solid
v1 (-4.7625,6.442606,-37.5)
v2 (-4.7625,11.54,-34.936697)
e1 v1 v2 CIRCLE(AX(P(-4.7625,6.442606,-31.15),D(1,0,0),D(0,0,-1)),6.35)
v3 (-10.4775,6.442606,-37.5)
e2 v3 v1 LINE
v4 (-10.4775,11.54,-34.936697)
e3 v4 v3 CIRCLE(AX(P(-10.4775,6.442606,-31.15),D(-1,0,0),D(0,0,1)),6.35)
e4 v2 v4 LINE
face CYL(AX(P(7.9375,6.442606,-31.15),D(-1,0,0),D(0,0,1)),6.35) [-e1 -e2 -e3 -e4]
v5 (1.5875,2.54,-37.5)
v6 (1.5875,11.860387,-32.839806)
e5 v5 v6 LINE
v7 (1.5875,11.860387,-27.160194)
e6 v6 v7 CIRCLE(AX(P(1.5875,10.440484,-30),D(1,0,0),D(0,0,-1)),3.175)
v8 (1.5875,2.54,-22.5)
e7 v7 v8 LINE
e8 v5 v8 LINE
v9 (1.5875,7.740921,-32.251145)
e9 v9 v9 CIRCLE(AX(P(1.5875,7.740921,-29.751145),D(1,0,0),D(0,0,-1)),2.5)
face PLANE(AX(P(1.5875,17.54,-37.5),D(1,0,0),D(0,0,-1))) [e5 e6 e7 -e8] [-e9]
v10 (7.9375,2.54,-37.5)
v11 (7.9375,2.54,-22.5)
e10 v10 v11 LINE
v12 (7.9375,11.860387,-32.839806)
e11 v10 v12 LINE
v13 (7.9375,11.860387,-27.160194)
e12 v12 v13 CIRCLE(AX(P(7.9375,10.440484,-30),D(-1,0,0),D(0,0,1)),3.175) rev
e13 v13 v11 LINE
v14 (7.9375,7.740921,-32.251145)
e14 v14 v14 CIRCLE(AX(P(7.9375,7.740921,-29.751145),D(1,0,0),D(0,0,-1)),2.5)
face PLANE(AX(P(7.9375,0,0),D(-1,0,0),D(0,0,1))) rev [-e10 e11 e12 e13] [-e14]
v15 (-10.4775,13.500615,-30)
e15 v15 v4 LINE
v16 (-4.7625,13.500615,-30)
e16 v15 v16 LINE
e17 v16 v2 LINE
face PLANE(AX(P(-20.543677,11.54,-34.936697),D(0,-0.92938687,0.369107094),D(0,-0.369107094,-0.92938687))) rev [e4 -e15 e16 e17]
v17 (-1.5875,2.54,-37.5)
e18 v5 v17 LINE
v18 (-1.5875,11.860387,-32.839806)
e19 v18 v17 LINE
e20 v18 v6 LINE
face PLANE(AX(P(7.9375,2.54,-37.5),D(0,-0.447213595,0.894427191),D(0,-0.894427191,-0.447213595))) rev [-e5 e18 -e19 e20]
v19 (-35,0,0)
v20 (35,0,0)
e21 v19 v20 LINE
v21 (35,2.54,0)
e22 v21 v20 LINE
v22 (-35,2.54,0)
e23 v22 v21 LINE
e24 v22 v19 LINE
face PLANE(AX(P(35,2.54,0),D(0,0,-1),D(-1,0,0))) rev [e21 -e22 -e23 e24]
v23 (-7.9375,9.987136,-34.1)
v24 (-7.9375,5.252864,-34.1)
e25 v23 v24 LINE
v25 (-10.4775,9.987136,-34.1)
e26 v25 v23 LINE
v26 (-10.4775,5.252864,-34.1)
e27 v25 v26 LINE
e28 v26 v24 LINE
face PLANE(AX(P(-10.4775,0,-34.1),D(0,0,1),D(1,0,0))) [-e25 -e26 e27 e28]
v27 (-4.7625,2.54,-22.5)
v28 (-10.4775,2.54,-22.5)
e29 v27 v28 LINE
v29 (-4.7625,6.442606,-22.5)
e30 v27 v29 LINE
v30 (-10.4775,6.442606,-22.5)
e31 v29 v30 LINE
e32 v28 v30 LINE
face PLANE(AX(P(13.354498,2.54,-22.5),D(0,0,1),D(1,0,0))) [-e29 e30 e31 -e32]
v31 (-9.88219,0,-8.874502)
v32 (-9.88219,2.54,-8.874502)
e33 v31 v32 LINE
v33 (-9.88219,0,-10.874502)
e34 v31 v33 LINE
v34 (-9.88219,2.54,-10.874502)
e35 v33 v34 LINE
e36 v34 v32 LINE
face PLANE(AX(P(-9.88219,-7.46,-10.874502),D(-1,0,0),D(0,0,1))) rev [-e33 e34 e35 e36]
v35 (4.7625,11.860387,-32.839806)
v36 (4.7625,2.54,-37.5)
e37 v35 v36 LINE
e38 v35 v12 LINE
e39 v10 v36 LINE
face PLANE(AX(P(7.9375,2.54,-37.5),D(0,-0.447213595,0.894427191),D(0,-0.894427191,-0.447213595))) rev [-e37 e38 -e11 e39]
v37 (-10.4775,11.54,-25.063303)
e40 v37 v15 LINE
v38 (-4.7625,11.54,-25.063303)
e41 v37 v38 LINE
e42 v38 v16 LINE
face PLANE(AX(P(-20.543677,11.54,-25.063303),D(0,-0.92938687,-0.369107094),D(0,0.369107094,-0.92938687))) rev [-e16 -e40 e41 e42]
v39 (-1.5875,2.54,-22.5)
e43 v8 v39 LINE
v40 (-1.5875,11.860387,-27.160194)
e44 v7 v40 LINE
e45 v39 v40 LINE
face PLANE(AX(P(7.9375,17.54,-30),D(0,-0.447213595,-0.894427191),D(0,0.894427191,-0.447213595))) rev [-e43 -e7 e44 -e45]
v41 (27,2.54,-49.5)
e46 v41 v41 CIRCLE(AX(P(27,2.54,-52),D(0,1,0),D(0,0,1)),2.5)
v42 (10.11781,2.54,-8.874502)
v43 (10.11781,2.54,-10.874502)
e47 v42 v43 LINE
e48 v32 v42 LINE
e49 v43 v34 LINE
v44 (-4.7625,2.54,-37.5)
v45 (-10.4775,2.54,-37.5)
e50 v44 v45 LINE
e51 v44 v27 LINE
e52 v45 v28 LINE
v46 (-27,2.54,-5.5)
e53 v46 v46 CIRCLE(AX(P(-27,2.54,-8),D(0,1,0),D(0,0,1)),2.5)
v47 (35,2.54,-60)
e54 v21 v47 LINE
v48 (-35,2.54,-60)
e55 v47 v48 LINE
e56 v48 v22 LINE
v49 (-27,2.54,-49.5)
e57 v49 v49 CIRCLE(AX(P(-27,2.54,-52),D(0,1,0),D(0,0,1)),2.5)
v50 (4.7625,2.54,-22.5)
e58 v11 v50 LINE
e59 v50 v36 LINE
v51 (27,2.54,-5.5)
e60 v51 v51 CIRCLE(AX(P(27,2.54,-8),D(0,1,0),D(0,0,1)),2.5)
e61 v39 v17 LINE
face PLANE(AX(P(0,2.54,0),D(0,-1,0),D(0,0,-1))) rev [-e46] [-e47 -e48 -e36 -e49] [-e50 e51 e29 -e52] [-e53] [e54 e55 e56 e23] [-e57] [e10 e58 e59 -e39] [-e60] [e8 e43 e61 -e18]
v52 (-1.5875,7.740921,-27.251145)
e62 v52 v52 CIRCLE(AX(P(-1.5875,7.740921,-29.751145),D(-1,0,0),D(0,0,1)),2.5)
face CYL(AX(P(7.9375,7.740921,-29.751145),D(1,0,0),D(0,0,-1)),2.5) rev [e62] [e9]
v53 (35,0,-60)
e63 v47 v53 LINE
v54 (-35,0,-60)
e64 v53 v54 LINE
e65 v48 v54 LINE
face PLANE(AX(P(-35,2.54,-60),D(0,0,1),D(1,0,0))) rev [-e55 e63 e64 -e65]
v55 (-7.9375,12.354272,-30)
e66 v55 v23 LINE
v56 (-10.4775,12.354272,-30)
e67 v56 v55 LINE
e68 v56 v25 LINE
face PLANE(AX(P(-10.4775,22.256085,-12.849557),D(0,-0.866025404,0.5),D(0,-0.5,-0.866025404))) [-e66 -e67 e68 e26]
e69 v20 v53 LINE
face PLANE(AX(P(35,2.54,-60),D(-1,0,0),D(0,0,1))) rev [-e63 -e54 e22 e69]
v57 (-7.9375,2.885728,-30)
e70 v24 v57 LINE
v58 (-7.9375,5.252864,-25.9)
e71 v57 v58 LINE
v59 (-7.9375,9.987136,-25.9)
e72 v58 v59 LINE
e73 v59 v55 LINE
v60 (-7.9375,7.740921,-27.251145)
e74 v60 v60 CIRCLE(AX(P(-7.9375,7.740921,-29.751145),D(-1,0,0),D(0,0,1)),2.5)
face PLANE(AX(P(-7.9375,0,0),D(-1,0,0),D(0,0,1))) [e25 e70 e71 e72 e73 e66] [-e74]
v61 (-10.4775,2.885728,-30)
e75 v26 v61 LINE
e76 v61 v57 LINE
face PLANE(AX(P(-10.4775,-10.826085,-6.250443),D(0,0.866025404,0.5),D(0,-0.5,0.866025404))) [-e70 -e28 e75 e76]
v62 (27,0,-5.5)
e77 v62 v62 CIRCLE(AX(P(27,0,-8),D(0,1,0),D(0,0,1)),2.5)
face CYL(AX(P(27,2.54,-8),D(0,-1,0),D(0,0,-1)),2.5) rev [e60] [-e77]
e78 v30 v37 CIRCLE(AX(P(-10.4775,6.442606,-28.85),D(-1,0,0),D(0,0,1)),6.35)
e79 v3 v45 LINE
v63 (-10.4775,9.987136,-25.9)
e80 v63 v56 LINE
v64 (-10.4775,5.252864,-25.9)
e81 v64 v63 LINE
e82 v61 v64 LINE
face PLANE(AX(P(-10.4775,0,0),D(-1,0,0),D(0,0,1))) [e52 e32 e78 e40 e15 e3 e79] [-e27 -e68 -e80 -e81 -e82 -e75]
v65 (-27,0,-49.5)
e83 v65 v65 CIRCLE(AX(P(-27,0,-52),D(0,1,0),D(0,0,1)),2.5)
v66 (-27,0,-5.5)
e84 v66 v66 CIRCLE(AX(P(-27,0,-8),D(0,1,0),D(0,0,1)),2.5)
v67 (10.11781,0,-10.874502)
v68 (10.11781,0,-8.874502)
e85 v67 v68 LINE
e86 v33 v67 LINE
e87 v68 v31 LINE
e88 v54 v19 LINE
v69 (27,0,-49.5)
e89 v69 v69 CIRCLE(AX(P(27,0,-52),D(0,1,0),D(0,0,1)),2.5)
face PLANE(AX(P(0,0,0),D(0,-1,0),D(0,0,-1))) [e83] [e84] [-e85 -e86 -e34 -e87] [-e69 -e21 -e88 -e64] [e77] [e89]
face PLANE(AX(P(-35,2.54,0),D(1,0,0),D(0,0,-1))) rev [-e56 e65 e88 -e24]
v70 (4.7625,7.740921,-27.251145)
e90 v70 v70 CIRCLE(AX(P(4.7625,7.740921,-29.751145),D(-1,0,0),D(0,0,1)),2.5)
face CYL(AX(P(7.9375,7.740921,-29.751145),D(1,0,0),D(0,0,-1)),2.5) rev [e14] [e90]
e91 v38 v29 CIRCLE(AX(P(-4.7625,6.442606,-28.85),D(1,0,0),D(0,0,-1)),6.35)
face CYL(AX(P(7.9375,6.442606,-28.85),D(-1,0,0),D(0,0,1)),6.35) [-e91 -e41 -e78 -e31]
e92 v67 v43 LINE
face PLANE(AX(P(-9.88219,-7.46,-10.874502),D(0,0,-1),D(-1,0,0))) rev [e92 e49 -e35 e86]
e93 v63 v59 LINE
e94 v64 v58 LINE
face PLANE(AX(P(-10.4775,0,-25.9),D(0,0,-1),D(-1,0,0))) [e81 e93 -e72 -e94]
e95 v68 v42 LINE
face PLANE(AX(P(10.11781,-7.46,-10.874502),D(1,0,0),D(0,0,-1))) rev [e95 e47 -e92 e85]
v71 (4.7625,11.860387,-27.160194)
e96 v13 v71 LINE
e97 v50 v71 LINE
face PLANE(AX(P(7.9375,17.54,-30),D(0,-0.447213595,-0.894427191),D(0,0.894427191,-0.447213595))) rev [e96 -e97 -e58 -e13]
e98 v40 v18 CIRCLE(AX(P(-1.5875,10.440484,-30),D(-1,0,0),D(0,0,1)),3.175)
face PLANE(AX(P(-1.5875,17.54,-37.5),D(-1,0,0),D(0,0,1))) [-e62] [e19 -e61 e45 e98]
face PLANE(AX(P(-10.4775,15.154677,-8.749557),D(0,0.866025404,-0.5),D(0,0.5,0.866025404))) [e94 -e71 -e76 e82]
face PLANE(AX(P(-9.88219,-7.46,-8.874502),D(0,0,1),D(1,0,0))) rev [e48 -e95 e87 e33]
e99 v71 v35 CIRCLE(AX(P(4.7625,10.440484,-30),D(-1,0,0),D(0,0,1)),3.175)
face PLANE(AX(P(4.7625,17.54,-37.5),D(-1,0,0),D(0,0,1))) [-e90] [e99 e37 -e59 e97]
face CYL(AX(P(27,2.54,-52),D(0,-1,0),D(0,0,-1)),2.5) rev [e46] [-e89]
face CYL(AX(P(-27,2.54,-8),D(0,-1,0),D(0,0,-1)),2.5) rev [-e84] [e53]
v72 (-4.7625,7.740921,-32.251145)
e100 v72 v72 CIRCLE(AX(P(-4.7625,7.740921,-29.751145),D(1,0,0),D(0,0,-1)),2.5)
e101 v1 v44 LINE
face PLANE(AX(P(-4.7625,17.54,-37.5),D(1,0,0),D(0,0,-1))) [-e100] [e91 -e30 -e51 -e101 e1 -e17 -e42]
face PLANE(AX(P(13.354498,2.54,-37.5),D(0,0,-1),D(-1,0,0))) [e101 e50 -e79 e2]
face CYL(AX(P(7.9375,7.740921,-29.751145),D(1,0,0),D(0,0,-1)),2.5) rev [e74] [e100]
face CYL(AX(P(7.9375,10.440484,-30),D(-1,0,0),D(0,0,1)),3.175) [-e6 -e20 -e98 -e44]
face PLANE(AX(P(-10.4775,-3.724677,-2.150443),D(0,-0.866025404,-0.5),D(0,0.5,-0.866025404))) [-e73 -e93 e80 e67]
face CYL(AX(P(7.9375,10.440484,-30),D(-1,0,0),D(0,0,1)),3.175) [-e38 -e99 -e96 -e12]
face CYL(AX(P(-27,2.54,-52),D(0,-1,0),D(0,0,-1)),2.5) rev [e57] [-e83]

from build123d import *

# Parameters (mm, degrees)
SKETCH1_W                 = 70
SKETCH1_H                 = 60
SKETCH1_R                 = 2.5
BOSS_EXTRUDE1_DEPTH       = 2.54
SKETCH2_R                 = 1.651
BOSS_EXTRUDE2_DEPTH       = 7.9375
SKETCH3_W                 = 3.175
SKETCH3_H                 = 15
CUT_EXTRUDE1_DEPTH        = 15
FILLET1_R                 = 3.175
SKETCH6_W                 = 15
SKETCH6_H                 = 10.16
SKETCH6_R                 = 1.651
BOSS_EXTRUDE5_DEPTH       = 3.175
BOSS_EXTRUDE6_DEPTH       = 2.54
FILLET2_R                 = 6.35
F_5_0MM_DOWEL_HOLE1_D     = 5
F_5_0MM_DOWEL_HOLE1_DEPTH = 20
F_5_0MM_DOWEL_HOLE1_TIP   = 1.502151548
SKETCH10_W                = 20
SKETCH10_H                = 2
CUT_EXTRUDE2_DEPTH        = 10
BOSS_EXTRUDE8_DEPTH       = 2.54
CUT_EXTRUDE3_START        = -6.35
CUT_EXTRUDE3_DEPTH        = 6.35


with BuildPart() as part:
    # Sketch1 → Boss-Extrude1 (new body)
    with BuildSketch(Plane(origin=(0, 0, 0), x_dir=(1, 0, 0), z_dir=(0, 1, 0))):
        with Locations((0, 30)):
            Rectangle(SKETCH1_W, SKETCH1_H)
        with Locations(Location((-27, 52, 0), (0, 0, 270))):
            Circle(SKETCH1_R, mode=Mode.SUBTRACT)
        with Locations(Location((-27, 8, 0), (0, 0, 270))):
            Circle(SKETCH1_R, mode=Mode.SUBTRACT)
        with Locations(Location((27, 52, 0), (0, 0, 270))):
            Circle(SKETCH1_R, mode=Mode.SUBTRACT)
        with Locations(Location((27, 8, 0), (0, 0, 270))):
            Circle(SKETCH1_R, mode=Mode.SUBTRACT)
    extrude(amount=BOSS_EXTRUDE1_DEPTH)

    # Sketch2 → Boss-Extrude2 (add, symmetric)
    with BuildSketch(Plane(origin=(0, 0, 0), x_dir=(0, 0, -1), z_dir=(1, 0, 0))):
        Polygon((37.5, 2.54), (30, 17.54), (22.5, 2.54), align=None)
        with Locations((30, 7.62)):
            Circle(SKETCH2_R, mode=Mode.SUBTRACT)
    extrude(amount=BOSS_EXTRUDE2_DEPTH, both=True)

    # Sketch3 → Cut-Extrude1 (cut)
    with BuildSketch(Plane(origin=(0, 2.54, 0), x_dir=(1, 0, 0), z_dir=(0, 1, 0))):
        with Locations((-3.175, 30)):
            Rectangle(SKETCH3_W, SKETCH3_H)
        with Locations((3.175, 30)):
            Rectangle(SKETCH3_W, SKETCH3_H)
    extrude(amount=CUT_EXTRUDE1_DEPTH, mode=Mode.SUBTRACT)

    # Fillet1
    fillet1_edges = [part.edges().sort_by_distance(p)[0] for p in [
        (6.35, 17.54, -30),
        (-6.35, 17.54, -30),
        (0, 17.54, -30),
    ]]
    fillet(fillet1_edges, radius=FILLET1_R)

    # Sketch6 → Boss-Extrude5 (add)
    with BuildSketch(Plane.ZY.offset(7.9375)):
        with Locations((-30, 7.62)):
            Rectangle(SKETCH6_W, SKETCH6_H)
        with Locations((-30, 7.62)):
            Circle(SKETCH6_R, mode=Mode.SUBTRACT)
    extrude(amount=-BOSS_EXTRUDE5_DEPTH)

    # Sketch4 → Boss-Extrude6 (add)
    with BuildSketch(Plane.ZY.offset(7.9375)):
        Polygon((-37.5, 11.54), (-37.5, 2.54), (-22.5, 2.54), (-22.5, 11.54), (-28.589639166, 11.54), (-25.9, 9.987136104), (-25.9, 5.252863896), (-30, 2.885727793), (-34.1, 5.252863896), (-34.1, 9.987136104), (-31.410360834, 11.54), align=None)
    extrude(amount=BOSS_EXTRUDE6_DEPTH)

    # Fillet2
    # the kernel refuses this fillet: 6.35 mm, written as the material it takes off along each edge
    with BuildSketch(Plane(origin=(-23.580984977, 12.7, -22.5), x_dir=(0, 0, -1), z_dir=(1, 0, 0))) as fillet2_piece_1:
        with BuildLine():
            CenterArc((6.35, -6.257393991), FILLET2_R, 99.79714572, 80.202854281)
            Line((0, -6.257393991), (-0.127, -6.257393991))
            Line((-0.127, -6.257393991), (-0.127, 0))
            Line((-0.127, 0), (0, 0.127))
            ThreePointArc((0, 0.127), (2.634740701, 0.127), (5.247871029, 0.12514788))
            Line((5.247871029, 0.12514788), (5.269481401, 0))
        make_face()
    extrude(amount=34.461969954, mode=Mode.SUBTRACT)
    with BuildSketch(Plane(origin=(-23.580984977, 12.7, -37.5), x_dir=(0, 0, 1), z_dir=(1, 0, 0))) as fillet2_piece_2:
        with BuildLine():
            CenterArc((6.35, 6.257393991), FILLET2_R, 180, 80.202854281)
            Line((0, 6.257393991), (-0.127, 6.257393991))
            Line((-0.127, 6.257393991), (-0.127, 0))
            Line((-0.127, 0), (0, -0.127))
            ThreePointArc((0, -0.127), (2.634740701, -0.127), (5.247871029, -0.12514788))
            Line((5.247871029, -0.12514788), (5.269481401, 0))
        make_face()
    extrude(amount=34.461969954, mode=Mode.SUBTRACT)

    # Ø5.0mm Dowel Hole1
    with Locations(Plane(origin=(7.9375, 0, 0), x_dir=(0, 0, -1), z_dir=(1, 0, 0))):
        with Locations((29.751144641, 7.740920916)):
            Hole(F_5_0MM_DOWEL_HOLE1_D / 2, depth=F_5_0MM_DOWEL_HOLE1_DEPTH)
            with Locations((0, 0, -(F_5_0MM_DOWEL_HOLE1_DEPTH + F_5_0MM_DOWEL_HOLE1_TIP / 2))):  # 118° drill point
                Cone(0, F_5_0MM_DOWEL_HOLE1_D / 2, F_5_0MM_DOWEL_HOLE1_TIP, mode=Mode.SUBTRACT)

    # Sketch10 → Cut-Extrude2 (cut)
    with BuildSketch(Plane(origin=(0, 2.54, 0), x_dir=(1, 0, 0), z_dir=(0, 1, 0))):
        with Locations((0.117809829, 9.874502057)):
            Rectangle(SKETCH10_W, SKETCH10_H)
    extrude(amount=-CUT_EXTRUDE2_DEPTH, mode=Mode.SUBTRACT)

    # Sketch12 → Boss-Extrude8 (add)
    with BuildSketch(Plane.ZY.offset(7.9375)):
        Polygon((-31.410360834, 11.54), (-30, 12.354272207), (-28.589639166, 11.54), (-25.063302956, 11.54), (-30, 13.500615067), (-34.936697044, 11.54), align=None)
    extrude(amount=BOSS_EXTRUDE8_DEPTH)

    # Sketch13 → Cut-Extrude3 (cut)
    with BuildSketch(Plane.ZY.offset(7.9375).offset(CUT_EXTRUDE3_START)):
        with BuildLine():
            Line((-34.936697044, 11.54), (-30, 13.500615067))
            Line((-30, 13.500615067), (-25.063302956, 11.54))
            ThreePointArc((-25.063302956, 11.54), (-26.34823122, 12.279013549), (-27.769481401, 12.7))
            ThreePointArc((-27.769481401, 12.7), (-30, 13.615484171), (-32.230518599, 12.7))
            ThreePointArc((-32.230518599, 12.7), (-33.65176878, 12.279013549), (-34.936697044, 11.54))
        make_face()
    extrude(amount=CUT_EXTRUDE3_DEPTH, mode=Mode.SUBTRACT)


solid = part.part
